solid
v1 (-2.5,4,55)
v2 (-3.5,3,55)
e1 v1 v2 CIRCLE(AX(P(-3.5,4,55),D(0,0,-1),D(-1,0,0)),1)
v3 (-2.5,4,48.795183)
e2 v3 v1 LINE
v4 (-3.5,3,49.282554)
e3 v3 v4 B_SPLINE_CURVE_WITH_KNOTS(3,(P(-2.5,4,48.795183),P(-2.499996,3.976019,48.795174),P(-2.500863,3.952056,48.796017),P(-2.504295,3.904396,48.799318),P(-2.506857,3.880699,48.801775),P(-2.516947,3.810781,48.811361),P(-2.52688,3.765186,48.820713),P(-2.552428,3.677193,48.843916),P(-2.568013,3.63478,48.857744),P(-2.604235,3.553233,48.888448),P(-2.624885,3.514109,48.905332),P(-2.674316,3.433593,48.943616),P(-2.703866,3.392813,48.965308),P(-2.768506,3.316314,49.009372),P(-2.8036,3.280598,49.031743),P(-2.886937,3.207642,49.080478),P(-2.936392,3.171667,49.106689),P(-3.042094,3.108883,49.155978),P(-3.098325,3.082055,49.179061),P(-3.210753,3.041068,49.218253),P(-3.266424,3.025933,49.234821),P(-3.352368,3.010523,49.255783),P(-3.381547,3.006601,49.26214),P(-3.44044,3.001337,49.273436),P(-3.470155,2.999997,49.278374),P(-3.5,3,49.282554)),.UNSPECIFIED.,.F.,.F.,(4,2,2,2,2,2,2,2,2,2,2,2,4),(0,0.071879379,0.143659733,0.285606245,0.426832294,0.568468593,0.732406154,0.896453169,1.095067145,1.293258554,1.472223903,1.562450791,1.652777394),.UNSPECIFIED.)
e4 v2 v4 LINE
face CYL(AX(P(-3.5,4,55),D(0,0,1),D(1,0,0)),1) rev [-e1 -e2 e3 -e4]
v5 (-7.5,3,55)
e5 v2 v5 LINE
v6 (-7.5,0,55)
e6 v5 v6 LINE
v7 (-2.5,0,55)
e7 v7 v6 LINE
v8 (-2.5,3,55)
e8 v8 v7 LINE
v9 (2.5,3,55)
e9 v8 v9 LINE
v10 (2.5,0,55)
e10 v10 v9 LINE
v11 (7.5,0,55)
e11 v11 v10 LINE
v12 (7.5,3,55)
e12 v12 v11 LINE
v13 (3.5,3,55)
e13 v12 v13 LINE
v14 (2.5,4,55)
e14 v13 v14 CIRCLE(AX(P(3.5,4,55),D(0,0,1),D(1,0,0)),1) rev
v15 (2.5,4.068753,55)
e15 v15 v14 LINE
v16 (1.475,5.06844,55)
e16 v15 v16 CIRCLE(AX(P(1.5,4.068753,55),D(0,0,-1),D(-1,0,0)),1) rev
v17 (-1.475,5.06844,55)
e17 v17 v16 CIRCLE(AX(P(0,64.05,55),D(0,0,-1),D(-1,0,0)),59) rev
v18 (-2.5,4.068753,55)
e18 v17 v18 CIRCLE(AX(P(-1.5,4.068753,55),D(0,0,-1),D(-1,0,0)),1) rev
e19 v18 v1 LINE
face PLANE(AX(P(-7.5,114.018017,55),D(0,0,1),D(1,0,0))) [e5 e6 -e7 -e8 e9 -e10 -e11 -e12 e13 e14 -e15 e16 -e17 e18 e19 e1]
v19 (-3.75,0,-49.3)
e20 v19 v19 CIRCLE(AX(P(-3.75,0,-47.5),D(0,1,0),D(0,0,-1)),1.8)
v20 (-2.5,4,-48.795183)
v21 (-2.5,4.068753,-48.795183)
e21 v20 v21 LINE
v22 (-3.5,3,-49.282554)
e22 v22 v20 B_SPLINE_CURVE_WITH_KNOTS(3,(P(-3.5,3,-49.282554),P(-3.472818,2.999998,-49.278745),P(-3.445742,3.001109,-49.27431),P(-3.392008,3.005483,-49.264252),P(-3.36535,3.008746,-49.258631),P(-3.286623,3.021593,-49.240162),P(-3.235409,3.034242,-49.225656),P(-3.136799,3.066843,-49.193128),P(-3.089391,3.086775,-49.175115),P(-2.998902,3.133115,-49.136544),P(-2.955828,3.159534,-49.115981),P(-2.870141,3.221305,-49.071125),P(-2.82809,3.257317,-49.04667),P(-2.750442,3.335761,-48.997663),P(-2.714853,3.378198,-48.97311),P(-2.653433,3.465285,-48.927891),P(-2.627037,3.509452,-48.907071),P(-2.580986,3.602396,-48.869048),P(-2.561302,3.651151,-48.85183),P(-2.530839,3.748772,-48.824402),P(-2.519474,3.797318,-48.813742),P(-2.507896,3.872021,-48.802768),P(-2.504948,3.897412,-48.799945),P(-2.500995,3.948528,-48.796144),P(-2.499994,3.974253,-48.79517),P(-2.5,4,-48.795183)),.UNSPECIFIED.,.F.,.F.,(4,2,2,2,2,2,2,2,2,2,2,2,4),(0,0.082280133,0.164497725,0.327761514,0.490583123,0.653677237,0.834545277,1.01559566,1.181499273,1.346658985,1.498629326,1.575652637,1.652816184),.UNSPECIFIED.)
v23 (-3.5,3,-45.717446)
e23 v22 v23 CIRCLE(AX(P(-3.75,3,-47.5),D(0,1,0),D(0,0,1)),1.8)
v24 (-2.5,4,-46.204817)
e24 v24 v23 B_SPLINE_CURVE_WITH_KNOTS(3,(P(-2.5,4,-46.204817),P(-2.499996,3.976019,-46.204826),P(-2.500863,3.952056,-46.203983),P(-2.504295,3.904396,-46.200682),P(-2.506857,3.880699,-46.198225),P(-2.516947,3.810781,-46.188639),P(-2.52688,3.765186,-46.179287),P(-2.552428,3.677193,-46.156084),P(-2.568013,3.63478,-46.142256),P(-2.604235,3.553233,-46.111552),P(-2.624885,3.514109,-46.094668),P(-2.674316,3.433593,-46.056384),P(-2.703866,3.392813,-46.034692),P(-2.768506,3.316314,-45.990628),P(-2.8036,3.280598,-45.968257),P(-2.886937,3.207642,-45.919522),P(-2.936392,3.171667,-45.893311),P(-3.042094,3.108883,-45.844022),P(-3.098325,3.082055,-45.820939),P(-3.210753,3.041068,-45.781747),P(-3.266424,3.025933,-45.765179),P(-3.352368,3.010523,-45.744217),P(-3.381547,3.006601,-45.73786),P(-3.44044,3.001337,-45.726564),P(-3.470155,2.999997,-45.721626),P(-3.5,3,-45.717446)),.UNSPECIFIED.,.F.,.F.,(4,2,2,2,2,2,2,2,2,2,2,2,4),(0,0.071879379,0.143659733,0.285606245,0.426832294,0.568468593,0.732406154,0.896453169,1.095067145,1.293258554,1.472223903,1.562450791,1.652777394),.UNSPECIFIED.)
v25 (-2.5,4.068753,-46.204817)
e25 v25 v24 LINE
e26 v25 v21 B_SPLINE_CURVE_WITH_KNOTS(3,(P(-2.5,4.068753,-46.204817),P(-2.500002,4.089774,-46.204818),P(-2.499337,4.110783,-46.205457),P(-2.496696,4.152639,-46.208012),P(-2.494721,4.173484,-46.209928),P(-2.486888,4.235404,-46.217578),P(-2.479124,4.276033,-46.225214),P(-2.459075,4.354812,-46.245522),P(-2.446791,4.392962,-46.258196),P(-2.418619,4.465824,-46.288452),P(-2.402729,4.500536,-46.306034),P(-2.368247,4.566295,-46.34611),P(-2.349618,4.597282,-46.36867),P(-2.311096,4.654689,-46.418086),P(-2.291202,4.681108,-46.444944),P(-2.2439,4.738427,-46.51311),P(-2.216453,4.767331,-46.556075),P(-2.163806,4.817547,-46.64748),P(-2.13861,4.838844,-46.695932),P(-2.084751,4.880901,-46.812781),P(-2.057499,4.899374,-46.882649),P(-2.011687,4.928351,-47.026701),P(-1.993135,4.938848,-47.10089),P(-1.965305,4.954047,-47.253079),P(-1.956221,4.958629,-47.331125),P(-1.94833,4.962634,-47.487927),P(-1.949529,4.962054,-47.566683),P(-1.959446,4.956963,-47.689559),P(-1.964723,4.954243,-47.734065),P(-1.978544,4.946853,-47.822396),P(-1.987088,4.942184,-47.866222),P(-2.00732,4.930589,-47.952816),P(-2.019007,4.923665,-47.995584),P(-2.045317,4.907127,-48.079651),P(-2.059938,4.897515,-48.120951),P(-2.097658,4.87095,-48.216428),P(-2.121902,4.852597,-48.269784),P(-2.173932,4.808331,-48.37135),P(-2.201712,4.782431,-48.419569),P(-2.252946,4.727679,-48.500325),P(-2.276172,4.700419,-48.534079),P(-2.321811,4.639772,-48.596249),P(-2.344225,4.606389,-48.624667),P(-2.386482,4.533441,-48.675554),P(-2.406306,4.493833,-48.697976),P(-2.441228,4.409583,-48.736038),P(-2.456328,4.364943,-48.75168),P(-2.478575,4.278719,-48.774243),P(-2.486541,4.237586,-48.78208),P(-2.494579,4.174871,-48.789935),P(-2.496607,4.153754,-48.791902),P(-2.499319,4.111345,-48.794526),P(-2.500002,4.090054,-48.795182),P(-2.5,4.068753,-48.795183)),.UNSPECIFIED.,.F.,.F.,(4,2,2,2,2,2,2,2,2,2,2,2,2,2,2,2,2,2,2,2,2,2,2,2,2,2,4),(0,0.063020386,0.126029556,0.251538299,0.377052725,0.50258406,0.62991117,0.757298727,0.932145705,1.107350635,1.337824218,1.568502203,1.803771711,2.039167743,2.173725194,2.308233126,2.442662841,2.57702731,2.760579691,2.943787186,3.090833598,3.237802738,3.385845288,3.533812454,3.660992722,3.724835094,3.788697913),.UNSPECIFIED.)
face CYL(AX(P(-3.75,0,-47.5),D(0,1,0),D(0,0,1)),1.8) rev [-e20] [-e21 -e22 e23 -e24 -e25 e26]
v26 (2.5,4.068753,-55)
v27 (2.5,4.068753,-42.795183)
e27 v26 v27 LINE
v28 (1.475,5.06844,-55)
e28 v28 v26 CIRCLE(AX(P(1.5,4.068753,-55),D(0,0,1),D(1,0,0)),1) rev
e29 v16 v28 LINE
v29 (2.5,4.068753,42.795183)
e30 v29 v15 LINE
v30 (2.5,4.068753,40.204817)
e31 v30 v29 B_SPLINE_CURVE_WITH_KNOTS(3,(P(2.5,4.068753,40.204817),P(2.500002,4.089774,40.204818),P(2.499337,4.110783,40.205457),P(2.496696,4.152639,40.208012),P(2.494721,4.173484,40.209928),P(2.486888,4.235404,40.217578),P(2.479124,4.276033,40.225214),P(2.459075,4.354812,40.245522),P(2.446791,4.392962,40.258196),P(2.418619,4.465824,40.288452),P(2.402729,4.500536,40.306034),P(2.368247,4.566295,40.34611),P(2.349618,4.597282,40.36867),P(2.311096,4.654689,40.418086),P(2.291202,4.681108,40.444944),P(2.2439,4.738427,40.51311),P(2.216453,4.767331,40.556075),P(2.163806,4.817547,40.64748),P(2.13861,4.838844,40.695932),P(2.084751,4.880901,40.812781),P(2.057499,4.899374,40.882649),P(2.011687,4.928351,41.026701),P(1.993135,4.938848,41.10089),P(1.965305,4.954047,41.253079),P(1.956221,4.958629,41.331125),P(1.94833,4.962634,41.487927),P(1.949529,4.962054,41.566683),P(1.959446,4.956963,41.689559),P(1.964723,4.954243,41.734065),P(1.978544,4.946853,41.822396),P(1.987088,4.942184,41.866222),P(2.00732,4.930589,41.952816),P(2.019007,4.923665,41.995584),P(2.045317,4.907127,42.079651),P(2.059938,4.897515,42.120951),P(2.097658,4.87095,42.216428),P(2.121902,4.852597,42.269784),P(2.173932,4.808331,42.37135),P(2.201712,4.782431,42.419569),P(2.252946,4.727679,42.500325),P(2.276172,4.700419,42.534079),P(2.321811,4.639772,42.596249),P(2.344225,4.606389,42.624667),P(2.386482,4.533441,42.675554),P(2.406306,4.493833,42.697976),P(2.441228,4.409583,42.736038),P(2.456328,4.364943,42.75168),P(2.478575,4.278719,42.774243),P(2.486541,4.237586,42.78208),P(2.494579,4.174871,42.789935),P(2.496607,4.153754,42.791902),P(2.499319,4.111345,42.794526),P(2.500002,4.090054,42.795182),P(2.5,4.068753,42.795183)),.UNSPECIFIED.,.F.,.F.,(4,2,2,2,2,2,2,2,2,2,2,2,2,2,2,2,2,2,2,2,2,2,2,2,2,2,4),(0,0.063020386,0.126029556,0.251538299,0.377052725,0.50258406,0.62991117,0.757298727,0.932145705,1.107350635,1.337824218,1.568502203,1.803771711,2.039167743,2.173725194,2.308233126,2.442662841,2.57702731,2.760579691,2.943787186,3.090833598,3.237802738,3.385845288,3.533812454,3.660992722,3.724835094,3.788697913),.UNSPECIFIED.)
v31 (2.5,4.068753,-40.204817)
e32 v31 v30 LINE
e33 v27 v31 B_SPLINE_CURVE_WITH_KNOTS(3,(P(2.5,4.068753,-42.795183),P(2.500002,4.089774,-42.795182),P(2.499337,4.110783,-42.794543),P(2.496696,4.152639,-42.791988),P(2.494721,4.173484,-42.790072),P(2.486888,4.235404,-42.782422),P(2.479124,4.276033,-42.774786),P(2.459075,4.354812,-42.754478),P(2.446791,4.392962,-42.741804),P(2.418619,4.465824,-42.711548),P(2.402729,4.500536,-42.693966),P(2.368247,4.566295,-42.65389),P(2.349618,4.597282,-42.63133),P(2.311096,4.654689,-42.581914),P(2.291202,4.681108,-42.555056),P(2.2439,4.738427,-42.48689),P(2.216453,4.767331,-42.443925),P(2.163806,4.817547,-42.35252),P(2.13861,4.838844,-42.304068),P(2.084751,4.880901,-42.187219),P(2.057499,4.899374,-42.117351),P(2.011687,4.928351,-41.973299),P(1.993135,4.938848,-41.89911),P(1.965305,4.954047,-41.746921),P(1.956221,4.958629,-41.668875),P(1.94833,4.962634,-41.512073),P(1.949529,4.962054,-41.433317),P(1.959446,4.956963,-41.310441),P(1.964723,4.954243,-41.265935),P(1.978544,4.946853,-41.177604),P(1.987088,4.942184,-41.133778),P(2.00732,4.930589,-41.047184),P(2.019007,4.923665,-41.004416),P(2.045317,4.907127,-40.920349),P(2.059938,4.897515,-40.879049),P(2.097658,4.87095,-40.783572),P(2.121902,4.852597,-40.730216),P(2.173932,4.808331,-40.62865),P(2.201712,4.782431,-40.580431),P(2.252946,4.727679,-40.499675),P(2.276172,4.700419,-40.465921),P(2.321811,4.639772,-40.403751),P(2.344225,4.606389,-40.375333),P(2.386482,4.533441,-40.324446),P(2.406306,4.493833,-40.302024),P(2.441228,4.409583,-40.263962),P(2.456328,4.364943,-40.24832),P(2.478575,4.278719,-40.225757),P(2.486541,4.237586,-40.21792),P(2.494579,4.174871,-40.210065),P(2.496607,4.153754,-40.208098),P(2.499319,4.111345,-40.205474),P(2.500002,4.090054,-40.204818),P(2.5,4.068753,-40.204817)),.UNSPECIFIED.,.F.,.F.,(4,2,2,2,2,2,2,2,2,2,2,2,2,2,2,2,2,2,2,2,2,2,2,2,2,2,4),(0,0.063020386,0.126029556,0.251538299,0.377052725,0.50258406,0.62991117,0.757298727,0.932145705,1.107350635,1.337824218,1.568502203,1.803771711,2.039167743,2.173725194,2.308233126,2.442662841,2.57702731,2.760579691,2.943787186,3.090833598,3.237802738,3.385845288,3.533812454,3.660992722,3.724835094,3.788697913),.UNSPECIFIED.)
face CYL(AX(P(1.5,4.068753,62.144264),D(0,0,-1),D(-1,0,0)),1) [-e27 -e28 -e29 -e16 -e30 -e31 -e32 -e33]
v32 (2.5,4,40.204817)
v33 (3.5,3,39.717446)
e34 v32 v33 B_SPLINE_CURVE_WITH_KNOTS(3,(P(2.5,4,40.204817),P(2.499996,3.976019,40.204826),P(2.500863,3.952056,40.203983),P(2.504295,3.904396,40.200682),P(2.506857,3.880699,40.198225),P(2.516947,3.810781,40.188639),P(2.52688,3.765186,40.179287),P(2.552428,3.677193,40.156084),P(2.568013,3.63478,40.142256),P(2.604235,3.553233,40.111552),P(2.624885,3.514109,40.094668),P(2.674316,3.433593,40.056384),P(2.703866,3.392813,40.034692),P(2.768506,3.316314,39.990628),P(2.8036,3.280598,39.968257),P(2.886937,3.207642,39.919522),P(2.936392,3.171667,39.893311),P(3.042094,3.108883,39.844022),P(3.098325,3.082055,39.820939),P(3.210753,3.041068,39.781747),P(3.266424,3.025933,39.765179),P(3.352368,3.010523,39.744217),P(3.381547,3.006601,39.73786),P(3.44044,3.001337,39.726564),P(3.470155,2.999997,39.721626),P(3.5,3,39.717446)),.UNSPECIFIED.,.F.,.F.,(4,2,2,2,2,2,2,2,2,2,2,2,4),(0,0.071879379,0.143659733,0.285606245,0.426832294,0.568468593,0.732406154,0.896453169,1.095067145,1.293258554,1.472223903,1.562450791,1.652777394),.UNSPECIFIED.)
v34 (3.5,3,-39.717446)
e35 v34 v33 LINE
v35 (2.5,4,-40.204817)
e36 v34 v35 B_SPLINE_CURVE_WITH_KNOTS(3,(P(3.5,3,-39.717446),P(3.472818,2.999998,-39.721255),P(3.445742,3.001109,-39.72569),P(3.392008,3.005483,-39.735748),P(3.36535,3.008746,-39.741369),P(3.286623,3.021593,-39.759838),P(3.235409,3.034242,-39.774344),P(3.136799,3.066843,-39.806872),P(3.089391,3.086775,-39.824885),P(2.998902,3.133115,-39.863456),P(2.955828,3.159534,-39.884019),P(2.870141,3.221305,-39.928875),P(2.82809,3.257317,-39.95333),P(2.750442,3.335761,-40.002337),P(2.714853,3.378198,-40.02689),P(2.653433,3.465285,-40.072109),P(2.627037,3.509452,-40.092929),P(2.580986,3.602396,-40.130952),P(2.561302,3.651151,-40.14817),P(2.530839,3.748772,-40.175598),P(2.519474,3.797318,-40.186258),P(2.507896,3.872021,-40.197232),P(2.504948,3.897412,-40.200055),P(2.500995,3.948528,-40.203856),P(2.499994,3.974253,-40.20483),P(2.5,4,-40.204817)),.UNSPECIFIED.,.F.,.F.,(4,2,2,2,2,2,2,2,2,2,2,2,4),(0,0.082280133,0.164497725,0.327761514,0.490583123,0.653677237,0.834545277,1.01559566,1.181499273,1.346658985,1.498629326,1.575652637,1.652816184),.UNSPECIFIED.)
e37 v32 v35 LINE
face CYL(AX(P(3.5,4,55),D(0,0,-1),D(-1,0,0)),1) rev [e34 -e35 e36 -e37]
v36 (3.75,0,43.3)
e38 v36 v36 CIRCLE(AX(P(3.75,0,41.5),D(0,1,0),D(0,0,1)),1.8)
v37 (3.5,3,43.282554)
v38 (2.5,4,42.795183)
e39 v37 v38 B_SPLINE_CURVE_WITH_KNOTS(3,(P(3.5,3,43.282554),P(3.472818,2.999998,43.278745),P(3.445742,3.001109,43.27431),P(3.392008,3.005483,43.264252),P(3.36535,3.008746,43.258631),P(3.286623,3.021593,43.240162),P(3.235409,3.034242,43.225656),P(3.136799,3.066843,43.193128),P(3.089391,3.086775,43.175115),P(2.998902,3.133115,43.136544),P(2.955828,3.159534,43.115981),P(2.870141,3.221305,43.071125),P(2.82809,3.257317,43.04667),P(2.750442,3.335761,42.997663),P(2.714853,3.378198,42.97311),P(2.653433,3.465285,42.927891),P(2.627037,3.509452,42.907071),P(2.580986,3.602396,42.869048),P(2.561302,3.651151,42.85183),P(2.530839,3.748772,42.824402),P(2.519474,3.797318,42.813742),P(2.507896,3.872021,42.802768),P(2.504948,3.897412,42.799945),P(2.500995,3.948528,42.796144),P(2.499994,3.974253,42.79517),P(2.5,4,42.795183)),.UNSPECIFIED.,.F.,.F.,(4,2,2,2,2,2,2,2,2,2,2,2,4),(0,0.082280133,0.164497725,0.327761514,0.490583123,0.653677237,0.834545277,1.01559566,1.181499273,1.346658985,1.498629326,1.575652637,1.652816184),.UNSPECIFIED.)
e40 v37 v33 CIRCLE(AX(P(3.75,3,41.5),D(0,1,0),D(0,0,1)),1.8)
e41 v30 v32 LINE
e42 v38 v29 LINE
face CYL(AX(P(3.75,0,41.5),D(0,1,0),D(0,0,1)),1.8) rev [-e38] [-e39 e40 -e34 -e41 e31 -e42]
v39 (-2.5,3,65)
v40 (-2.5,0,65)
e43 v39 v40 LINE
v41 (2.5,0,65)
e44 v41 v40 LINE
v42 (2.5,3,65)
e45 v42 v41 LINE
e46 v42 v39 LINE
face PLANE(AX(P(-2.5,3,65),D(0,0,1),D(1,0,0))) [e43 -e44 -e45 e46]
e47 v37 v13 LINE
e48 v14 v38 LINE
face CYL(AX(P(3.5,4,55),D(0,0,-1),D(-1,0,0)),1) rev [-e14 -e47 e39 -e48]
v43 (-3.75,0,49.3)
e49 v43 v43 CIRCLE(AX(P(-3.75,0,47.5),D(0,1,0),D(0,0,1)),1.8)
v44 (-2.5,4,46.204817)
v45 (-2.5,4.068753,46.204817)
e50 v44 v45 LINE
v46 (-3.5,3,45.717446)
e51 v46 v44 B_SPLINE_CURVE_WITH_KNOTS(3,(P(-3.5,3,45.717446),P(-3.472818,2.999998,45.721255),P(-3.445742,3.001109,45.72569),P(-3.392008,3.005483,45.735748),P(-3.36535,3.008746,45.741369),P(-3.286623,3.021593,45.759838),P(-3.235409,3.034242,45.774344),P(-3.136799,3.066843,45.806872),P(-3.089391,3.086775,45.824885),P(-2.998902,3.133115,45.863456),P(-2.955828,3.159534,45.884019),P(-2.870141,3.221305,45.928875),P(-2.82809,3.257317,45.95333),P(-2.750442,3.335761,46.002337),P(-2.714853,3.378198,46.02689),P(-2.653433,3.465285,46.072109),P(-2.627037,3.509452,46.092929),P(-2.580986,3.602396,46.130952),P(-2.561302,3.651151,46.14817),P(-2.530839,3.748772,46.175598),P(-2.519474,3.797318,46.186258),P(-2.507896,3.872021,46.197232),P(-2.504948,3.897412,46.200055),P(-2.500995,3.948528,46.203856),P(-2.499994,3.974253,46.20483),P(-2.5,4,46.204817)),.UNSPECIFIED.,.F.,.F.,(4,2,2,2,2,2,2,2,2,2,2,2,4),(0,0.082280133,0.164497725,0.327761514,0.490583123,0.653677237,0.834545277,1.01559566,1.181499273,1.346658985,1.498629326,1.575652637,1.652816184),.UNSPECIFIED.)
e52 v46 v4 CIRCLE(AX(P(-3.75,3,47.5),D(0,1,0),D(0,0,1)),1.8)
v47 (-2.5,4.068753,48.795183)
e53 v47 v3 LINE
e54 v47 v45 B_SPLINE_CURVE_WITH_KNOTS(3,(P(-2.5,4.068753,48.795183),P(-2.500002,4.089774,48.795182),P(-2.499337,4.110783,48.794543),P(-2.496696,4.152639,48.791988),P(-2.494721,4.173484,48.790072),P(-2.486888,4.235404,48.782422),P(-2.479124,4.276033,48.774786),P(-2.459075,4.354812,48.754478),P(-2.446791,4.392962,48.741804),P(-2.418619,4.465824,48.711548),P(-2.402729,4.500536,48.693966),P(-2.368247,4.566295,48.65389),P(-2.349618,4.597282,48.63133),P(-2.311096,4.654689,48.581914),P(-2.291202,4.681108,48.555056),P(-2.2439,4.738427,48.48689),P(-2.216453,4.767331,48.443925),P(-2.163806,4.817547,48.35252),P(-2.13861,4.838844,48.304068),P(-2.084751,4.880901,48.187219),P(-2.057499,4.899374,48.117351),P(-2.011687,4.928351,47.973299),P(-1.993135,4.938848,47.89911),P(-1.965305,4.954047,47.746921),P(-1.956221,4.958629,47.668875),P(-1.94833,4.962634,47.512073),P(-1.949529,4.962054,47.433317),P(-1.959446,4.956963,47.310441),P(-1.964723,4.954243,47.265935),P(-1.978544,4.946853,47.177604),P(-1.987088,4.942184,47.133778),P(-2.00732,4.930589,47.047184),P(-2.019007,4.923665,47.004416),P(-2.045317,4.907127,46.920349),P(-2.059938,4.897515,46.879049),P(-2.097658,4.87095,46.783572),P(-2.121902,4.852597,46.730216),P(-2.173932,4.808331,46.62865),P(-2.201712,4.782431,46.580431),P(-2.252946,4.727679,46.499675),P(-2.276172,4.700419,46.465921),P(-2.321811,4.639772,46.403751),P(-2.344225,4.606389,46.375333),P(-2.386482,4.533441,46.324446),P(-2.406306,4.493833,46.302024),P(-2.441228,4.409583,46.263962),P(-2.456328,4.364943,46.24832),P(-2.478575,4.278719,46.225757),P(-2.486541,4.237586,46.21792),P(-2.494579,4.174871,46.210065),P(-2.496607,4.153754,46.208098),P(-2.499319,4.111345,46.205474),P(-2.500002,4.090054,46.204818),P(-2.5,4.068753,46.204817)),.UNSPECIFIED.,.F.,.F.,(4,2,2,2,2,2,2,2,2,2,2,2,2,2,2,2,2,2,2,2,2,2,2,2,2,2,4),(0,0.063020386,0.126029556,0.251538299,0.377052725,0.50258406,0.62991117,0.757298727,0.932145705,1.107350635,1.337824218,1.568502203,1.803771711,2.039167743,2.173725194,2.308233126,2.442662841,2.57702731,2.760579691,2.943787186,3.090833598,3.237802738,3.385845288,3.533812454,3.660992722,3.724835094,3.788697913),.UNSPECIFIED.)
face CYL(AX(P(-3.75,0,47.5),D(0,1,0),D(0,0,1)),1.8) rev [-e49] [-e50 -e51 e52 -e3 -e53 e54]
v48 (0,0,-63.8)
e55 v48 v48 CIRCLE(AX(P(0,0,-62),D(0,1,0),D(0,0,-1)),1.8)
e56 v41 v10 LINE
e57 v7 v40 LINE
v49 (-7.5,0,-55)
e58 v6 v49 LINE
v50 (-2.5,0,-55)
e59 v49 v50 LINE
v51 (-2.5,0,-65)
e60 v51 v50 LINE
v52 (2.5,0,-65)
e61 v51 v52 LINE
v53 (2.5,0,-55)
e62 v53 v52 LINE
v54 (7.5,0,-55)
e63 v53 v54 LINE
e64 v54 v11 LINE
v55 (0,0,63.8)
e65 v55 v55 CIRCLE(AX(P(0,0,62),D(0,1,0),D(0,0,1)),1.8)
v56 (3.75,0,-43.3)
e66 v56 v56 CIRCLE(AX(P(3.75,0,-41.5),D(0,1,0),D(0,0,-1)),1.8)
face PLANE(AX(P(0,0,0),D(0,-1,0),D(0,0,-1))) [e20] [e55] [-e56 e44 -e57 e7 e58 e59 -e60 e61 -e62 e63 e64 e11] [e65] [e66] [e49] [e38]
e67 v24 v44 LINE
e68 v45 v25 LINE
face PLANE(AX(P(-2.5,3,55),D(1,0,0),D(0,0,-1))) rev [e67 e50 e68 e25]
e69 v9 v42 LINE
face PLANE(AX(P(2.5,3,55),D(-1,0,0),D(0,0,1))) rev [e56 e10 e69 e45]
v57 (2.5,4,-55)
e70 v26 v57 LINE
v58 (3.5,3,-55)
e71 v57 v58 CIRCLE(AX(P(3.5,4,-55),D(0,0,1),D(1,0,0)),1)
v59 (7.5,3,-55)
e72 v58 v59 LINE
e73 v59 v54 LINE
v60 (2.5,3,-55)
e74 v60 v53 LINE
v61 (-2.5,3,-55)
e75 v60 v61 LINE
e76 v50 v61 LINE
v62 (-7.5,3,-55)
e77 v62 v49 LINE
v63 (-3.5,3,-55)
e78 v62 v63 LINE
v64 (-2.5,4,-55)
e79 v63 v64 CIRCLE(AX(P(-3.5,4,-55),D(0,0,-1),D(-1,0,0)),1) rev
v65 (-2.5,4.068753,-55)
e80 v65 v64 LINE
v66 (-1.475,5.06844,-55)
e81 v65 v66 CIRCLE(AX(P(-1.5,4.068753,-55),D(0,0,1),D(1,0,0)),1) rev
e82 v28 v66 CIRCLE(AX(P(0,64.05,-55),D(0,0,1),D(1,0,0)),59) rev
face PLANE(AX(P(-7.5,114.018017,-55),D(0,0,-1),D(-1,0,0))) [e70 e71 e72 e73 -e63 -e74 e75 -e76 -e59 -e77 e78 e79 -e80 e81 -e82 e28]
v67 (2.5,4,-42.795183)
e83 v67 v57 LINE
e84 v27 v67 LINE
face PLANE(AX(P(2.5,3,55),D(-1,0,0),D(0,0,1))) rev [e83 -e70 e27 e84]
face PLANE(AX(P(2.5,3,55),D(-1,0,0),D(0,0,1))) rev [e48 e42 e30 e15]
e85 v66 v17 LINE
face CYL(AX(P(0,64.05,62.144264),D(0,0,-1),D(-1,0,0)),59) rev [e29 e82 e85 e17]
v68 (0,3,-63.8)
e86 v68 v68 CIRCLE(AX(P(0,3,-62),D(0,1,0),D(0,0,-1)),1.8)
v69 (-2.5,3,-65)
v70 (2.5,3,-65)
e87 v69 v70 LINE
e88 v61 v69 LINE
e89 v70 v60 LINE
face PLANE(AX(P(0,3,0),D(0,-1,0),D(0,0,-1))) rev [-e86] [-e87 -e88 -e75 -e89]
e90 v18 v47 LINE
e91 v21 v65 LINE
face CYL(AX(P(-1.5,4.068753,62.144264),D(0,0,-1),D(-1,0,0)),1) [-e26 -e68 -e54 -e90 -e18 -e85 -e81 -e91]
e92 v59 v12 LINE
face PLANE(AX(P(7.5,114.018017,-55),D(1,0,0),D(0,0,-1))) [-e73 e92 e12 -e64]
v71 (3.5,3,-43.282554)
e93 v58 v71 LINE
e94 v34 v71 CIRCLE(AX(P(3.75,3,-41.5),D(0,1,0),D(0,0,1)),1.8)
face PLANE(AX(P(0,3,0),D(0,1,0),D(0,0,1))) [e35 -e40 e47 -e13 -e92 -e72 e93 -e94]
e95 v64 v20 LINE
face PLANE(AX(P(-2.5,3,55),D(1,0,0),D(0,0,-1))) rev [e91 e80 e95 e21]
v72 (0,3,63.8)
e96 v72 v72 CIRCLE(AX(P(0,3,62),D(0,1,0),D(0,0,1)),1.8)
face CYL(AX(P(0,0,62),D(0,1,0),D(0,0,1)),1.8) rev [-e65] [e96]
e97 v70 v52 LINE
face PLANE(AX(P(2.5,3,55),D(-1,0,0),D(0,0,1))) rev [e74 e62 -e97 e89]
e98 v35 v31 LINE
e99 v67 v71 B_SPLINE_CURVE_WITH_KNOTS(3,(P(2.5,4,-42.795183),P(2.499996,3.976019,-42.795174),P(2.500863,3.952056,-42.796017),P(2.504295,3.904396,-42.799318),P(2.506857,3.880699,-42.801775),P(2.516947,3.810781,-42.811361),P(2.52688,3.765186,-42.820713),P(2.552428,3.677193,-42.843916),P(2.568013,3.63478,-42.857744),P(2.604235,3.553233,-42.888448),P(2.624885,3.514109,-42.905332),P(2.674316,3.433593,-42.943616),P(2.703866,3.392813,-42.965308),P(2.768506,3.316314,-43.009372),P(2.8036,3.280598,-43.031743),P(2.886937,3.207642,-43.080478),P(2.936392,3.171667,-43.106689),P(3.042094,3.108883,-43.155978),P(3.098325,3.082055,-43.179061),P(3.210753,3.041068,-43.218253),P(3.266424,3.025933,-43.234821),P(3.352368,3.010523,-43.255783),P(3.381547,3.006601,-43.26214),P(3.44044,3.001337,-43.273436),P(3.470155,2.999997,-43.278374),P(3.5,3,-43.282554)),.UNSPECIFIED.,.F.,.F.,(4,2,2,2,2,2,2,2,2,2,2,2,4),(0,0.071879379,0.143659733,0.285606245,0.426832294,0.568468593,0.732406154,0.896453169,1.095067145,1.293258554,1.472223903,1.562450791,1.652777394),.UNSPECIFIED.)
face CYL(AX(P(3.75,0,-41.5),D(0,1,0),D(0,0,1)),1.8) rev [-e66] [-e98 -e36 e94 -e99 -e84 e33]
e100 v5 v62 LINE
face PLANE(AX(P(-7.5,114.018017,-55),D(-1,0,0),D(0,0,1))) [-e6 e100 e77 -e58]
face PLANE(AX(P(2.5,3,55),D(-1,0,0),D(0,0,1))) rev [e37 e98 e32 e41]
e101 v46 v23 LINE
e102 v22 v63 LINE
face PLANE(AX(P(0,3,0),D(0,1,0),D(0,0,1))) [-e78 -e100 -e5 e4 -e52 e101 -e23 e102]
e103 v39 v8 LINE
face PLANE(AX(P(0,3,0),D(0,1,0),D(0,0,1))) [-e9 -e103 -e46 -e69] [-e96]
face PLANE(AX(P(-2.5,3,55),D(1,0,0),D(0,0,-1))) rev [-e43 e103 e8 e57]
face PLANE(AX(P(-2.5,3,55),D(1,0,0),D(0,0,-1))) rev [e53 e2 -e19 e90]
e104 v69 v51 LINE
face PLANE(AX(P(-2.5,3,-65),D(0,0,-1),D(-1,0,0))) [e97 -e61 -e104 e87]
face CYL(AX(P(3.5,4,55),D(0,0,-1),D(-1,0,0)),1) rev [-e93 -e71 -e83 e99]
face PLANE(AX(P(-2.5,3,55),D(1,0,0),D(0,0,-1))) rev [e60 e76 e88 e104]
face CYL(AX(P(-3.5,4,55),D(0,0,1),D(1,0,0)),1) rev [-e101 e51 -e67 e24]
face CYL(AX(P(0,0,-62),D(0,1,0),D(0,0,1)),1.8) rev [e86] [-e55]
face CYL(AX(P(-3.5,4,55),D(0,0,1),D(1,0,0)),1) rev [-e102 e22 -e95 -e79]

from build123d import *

# Parameters (mm, degrees)
SKETCH1_W               = 5
SKETCH1_H               = 110
BOSS_EXTRUDE1_DEPTH     = 3
BOSS_EXTRUDE2_DEPTH     = 55
BOSS_EXTRUDE3_START     = 55
BOSS_EXTRUDE3_DEPTH     = 55
SKETCH8_W               = 5
SKETCH8_H               = 10
BOSS_EXTRUDE4_DEPTH     = 3
SKETCH6_R               = 1.8
CUT_EXTRUDE1_DEPTH      = 66.117202028
SKETCH9_W               = 15
SKETCH9_H               = 110
BOSS_EXTRUDE5_DEPTH     = 3
FILLET1_R               = 1
CUT_EXTRUDE2_DEPTH      = 66.5
CUT_EXTRUDE2_DEPTH_BACK = 66.5
SKETCH10_R              = 1.8


with BuildPart() as part:
    # Sketch1 → Boss-Extrude1 (new body)
    with BuildSketch(Plane(origin=(0, 0, 0), x_dir=(1, 0, 0), z_dir=(0, 1, 0))):
        Rectangle(SKETCH1_W, SKETCH1_H)
    extrude(amount=BOSS_EXTRUDE1_DEPTH)

    # Sketch3 → Boss-Extrude2 (add)
    with BuildSketch(Plane.XY):
        with BuildLine():
            Line((-2.5, 3), (-2.5, 5.102989898))
            ThreePointArc((-2.5, 5.102989898), (0, 5.05), (2.5, 5.102989898))
            Line((2.5, 5.102989898), (2.5, 3))
            Line((2.5, 3), (2.5, 0))
            Line((2.5, 0), (-2.5, 0))
            Line((-2.5, 0), (-2.5, 3))
        make_face()
    extrude(amount=BOSS_EXTRUDE2_DEPTH)

    # Sketch7 → Boss-Extrude3 (add)
    with BuildSketch(Plane(origin=(0, 0, 0), x_dir=(-1, 0, 0), z_dir=(0, 0, -1)).offset(BOSS_EXTRUDE3_START)):
        with BuildLine():
            Line((-2.5, 5.102989898), (-2.5, 3))
            Line((-2.5, 3), (2.5, 3))
            Line((2.5, 3), (2.5, 5.102989898))
            ThreePointArc((2.5, 5.102989898), (0, 5.05), (-2.5, 5.102989898))
        make_face()
    extrude(amount=-BOSS_EXTRUDE3_DEPTH)

    # Sketch8 → Boss-Extrude4 (add)
    with BuildSketch(Plane.XZ):
        with Locations((0, 60)):
            Rectangle(SKETCH8_W, SKETCH8_H)
        with Locations((0, -60)):
            Rectangle(SKETCH8_W, SKETCH8_H)
    extrude(amount=-BOSS_EXTRUDE4_DEPTH)

    # Sketch6 → Cut-Extrude1 (cut, through all)
    with BuildSketch(Plane(origin=(0, 3, 0), x_dir=(1, 0, 0), z_dir=(0, 1, 0))):
        with Locations(Location((0, -62, 0), (0, 0, 270))):
            Circle(SKETCH6_R)
        with Locations(Location((0, 62, 0), (0, 0, 90))):
            Circle(SKETCH6_R)
    extrude(amount=-CUT_EXTRUDE1_DEPTH, mode=Mode.SUBTRACT)

    # Sketch9 → Boss-Extrude5 (add)
    with BuildSketch(Plane.XZ):
        Rectangle(SKETCH9_W, SKETCH9_H)
    extrude(amount=-BOSS_EXTRUDE5_DEPTH)

    # Fillet1
    # the kernel refuses this fillet: 1 mm, written as the material it adds along each edge
    with BuildSketch(Plane(origin=(2.5, 3, -55), x_dir=(0, 1, 0), z_dir=(0, 0, 1)), Plane(origin=(-2.5, 3, 55), x_dir=(0, 1, 0), z_dir=(0, 0, -1))) as fillet1_piece_1:
        with BuildLine():
            CenterArc((FILLET1_R, -FILLET1_R), FILLET1_R, 90, 90)
            Line((0, -FILLET1_R), (0, 0))
            Line((0, 0), (FILLET1_R, 0))
        make_face()
    extrude(amount=110)
    # the kernel refuses this fillet: 1 mm, written as the material it takes off along each edge
    with BuildSketch(Plane(origin=(-2.5, 5.102989898, 57.585592418), x_dir=(0, -1, 0), z_dir=(0, 0, -1))) as fillet1_2_piece_1:
        with BuildLine():
            CenterArc((1.034236967, -1), FILLET1_R, 90, 91.432543738)
            ThreePointArc((0.034549516, -1.025), (0.019501965, -0.512424928), (0, 0))
            Line((0, 0), (1.034236967, 0))
        make_face()
    extrude(amount=115.171184836, mode=Mode.SUBTRACT)
    with BuildSketch(Plane(origin=(2.5, 5.102989898, 57.585592418), x_dir=(0, -1, 0), z_dir=(0, 0, -1))) as fillet1_2_piece_2:
        with BuildLine():
            CenterArc((1.034236967, 1), FILLET1_R, 178.567456262, 91.432543738)
            ThreePointArc((0.034549516, 1.025), (0.019501965, 0.512424928), (0, 0))
            Line((0, 0), (1.034236967, 0))
        make_face()
    extrude(amount=115.171184836, mode=Mode.SUBTRACT)

    # Sketch10 → Cut-Extrude2 (cut, two sides: drawn at the far end of the back side and taken through both)
    with BuildSketch(Plane(origin=(0, 3, 0), x_dir=(1, 0, 0), z_dir=(0, 1, 0)).offset(-CUT_EXTRUDE2_DEPTH_BACK)):
        with Locations(Location((-3.75, -47.5, 0), (0, 0, 270))):
            Circle(SKETCH10_R)
        with Locations(Location((3.75, -41.5, 0), (0, 0, 270))):
            Circle(SKETCH10_R)
        with Locations(Location((3.75, 41.5, 0), (0, 0, 262.016443854))):
            Circle(SKETCH10_R)
        with Locations(Location((-3.75, 47.5, 0), (0, 0, 277.983556146))):
            Circle(SKETCH10_R)
    extrude(amount=CUT_EXTRUDE2_DEPTH + CUT_EXTRUDE2_DEPTH_BACK, mode=Mode.SUBTRACT)


solid = part.part
